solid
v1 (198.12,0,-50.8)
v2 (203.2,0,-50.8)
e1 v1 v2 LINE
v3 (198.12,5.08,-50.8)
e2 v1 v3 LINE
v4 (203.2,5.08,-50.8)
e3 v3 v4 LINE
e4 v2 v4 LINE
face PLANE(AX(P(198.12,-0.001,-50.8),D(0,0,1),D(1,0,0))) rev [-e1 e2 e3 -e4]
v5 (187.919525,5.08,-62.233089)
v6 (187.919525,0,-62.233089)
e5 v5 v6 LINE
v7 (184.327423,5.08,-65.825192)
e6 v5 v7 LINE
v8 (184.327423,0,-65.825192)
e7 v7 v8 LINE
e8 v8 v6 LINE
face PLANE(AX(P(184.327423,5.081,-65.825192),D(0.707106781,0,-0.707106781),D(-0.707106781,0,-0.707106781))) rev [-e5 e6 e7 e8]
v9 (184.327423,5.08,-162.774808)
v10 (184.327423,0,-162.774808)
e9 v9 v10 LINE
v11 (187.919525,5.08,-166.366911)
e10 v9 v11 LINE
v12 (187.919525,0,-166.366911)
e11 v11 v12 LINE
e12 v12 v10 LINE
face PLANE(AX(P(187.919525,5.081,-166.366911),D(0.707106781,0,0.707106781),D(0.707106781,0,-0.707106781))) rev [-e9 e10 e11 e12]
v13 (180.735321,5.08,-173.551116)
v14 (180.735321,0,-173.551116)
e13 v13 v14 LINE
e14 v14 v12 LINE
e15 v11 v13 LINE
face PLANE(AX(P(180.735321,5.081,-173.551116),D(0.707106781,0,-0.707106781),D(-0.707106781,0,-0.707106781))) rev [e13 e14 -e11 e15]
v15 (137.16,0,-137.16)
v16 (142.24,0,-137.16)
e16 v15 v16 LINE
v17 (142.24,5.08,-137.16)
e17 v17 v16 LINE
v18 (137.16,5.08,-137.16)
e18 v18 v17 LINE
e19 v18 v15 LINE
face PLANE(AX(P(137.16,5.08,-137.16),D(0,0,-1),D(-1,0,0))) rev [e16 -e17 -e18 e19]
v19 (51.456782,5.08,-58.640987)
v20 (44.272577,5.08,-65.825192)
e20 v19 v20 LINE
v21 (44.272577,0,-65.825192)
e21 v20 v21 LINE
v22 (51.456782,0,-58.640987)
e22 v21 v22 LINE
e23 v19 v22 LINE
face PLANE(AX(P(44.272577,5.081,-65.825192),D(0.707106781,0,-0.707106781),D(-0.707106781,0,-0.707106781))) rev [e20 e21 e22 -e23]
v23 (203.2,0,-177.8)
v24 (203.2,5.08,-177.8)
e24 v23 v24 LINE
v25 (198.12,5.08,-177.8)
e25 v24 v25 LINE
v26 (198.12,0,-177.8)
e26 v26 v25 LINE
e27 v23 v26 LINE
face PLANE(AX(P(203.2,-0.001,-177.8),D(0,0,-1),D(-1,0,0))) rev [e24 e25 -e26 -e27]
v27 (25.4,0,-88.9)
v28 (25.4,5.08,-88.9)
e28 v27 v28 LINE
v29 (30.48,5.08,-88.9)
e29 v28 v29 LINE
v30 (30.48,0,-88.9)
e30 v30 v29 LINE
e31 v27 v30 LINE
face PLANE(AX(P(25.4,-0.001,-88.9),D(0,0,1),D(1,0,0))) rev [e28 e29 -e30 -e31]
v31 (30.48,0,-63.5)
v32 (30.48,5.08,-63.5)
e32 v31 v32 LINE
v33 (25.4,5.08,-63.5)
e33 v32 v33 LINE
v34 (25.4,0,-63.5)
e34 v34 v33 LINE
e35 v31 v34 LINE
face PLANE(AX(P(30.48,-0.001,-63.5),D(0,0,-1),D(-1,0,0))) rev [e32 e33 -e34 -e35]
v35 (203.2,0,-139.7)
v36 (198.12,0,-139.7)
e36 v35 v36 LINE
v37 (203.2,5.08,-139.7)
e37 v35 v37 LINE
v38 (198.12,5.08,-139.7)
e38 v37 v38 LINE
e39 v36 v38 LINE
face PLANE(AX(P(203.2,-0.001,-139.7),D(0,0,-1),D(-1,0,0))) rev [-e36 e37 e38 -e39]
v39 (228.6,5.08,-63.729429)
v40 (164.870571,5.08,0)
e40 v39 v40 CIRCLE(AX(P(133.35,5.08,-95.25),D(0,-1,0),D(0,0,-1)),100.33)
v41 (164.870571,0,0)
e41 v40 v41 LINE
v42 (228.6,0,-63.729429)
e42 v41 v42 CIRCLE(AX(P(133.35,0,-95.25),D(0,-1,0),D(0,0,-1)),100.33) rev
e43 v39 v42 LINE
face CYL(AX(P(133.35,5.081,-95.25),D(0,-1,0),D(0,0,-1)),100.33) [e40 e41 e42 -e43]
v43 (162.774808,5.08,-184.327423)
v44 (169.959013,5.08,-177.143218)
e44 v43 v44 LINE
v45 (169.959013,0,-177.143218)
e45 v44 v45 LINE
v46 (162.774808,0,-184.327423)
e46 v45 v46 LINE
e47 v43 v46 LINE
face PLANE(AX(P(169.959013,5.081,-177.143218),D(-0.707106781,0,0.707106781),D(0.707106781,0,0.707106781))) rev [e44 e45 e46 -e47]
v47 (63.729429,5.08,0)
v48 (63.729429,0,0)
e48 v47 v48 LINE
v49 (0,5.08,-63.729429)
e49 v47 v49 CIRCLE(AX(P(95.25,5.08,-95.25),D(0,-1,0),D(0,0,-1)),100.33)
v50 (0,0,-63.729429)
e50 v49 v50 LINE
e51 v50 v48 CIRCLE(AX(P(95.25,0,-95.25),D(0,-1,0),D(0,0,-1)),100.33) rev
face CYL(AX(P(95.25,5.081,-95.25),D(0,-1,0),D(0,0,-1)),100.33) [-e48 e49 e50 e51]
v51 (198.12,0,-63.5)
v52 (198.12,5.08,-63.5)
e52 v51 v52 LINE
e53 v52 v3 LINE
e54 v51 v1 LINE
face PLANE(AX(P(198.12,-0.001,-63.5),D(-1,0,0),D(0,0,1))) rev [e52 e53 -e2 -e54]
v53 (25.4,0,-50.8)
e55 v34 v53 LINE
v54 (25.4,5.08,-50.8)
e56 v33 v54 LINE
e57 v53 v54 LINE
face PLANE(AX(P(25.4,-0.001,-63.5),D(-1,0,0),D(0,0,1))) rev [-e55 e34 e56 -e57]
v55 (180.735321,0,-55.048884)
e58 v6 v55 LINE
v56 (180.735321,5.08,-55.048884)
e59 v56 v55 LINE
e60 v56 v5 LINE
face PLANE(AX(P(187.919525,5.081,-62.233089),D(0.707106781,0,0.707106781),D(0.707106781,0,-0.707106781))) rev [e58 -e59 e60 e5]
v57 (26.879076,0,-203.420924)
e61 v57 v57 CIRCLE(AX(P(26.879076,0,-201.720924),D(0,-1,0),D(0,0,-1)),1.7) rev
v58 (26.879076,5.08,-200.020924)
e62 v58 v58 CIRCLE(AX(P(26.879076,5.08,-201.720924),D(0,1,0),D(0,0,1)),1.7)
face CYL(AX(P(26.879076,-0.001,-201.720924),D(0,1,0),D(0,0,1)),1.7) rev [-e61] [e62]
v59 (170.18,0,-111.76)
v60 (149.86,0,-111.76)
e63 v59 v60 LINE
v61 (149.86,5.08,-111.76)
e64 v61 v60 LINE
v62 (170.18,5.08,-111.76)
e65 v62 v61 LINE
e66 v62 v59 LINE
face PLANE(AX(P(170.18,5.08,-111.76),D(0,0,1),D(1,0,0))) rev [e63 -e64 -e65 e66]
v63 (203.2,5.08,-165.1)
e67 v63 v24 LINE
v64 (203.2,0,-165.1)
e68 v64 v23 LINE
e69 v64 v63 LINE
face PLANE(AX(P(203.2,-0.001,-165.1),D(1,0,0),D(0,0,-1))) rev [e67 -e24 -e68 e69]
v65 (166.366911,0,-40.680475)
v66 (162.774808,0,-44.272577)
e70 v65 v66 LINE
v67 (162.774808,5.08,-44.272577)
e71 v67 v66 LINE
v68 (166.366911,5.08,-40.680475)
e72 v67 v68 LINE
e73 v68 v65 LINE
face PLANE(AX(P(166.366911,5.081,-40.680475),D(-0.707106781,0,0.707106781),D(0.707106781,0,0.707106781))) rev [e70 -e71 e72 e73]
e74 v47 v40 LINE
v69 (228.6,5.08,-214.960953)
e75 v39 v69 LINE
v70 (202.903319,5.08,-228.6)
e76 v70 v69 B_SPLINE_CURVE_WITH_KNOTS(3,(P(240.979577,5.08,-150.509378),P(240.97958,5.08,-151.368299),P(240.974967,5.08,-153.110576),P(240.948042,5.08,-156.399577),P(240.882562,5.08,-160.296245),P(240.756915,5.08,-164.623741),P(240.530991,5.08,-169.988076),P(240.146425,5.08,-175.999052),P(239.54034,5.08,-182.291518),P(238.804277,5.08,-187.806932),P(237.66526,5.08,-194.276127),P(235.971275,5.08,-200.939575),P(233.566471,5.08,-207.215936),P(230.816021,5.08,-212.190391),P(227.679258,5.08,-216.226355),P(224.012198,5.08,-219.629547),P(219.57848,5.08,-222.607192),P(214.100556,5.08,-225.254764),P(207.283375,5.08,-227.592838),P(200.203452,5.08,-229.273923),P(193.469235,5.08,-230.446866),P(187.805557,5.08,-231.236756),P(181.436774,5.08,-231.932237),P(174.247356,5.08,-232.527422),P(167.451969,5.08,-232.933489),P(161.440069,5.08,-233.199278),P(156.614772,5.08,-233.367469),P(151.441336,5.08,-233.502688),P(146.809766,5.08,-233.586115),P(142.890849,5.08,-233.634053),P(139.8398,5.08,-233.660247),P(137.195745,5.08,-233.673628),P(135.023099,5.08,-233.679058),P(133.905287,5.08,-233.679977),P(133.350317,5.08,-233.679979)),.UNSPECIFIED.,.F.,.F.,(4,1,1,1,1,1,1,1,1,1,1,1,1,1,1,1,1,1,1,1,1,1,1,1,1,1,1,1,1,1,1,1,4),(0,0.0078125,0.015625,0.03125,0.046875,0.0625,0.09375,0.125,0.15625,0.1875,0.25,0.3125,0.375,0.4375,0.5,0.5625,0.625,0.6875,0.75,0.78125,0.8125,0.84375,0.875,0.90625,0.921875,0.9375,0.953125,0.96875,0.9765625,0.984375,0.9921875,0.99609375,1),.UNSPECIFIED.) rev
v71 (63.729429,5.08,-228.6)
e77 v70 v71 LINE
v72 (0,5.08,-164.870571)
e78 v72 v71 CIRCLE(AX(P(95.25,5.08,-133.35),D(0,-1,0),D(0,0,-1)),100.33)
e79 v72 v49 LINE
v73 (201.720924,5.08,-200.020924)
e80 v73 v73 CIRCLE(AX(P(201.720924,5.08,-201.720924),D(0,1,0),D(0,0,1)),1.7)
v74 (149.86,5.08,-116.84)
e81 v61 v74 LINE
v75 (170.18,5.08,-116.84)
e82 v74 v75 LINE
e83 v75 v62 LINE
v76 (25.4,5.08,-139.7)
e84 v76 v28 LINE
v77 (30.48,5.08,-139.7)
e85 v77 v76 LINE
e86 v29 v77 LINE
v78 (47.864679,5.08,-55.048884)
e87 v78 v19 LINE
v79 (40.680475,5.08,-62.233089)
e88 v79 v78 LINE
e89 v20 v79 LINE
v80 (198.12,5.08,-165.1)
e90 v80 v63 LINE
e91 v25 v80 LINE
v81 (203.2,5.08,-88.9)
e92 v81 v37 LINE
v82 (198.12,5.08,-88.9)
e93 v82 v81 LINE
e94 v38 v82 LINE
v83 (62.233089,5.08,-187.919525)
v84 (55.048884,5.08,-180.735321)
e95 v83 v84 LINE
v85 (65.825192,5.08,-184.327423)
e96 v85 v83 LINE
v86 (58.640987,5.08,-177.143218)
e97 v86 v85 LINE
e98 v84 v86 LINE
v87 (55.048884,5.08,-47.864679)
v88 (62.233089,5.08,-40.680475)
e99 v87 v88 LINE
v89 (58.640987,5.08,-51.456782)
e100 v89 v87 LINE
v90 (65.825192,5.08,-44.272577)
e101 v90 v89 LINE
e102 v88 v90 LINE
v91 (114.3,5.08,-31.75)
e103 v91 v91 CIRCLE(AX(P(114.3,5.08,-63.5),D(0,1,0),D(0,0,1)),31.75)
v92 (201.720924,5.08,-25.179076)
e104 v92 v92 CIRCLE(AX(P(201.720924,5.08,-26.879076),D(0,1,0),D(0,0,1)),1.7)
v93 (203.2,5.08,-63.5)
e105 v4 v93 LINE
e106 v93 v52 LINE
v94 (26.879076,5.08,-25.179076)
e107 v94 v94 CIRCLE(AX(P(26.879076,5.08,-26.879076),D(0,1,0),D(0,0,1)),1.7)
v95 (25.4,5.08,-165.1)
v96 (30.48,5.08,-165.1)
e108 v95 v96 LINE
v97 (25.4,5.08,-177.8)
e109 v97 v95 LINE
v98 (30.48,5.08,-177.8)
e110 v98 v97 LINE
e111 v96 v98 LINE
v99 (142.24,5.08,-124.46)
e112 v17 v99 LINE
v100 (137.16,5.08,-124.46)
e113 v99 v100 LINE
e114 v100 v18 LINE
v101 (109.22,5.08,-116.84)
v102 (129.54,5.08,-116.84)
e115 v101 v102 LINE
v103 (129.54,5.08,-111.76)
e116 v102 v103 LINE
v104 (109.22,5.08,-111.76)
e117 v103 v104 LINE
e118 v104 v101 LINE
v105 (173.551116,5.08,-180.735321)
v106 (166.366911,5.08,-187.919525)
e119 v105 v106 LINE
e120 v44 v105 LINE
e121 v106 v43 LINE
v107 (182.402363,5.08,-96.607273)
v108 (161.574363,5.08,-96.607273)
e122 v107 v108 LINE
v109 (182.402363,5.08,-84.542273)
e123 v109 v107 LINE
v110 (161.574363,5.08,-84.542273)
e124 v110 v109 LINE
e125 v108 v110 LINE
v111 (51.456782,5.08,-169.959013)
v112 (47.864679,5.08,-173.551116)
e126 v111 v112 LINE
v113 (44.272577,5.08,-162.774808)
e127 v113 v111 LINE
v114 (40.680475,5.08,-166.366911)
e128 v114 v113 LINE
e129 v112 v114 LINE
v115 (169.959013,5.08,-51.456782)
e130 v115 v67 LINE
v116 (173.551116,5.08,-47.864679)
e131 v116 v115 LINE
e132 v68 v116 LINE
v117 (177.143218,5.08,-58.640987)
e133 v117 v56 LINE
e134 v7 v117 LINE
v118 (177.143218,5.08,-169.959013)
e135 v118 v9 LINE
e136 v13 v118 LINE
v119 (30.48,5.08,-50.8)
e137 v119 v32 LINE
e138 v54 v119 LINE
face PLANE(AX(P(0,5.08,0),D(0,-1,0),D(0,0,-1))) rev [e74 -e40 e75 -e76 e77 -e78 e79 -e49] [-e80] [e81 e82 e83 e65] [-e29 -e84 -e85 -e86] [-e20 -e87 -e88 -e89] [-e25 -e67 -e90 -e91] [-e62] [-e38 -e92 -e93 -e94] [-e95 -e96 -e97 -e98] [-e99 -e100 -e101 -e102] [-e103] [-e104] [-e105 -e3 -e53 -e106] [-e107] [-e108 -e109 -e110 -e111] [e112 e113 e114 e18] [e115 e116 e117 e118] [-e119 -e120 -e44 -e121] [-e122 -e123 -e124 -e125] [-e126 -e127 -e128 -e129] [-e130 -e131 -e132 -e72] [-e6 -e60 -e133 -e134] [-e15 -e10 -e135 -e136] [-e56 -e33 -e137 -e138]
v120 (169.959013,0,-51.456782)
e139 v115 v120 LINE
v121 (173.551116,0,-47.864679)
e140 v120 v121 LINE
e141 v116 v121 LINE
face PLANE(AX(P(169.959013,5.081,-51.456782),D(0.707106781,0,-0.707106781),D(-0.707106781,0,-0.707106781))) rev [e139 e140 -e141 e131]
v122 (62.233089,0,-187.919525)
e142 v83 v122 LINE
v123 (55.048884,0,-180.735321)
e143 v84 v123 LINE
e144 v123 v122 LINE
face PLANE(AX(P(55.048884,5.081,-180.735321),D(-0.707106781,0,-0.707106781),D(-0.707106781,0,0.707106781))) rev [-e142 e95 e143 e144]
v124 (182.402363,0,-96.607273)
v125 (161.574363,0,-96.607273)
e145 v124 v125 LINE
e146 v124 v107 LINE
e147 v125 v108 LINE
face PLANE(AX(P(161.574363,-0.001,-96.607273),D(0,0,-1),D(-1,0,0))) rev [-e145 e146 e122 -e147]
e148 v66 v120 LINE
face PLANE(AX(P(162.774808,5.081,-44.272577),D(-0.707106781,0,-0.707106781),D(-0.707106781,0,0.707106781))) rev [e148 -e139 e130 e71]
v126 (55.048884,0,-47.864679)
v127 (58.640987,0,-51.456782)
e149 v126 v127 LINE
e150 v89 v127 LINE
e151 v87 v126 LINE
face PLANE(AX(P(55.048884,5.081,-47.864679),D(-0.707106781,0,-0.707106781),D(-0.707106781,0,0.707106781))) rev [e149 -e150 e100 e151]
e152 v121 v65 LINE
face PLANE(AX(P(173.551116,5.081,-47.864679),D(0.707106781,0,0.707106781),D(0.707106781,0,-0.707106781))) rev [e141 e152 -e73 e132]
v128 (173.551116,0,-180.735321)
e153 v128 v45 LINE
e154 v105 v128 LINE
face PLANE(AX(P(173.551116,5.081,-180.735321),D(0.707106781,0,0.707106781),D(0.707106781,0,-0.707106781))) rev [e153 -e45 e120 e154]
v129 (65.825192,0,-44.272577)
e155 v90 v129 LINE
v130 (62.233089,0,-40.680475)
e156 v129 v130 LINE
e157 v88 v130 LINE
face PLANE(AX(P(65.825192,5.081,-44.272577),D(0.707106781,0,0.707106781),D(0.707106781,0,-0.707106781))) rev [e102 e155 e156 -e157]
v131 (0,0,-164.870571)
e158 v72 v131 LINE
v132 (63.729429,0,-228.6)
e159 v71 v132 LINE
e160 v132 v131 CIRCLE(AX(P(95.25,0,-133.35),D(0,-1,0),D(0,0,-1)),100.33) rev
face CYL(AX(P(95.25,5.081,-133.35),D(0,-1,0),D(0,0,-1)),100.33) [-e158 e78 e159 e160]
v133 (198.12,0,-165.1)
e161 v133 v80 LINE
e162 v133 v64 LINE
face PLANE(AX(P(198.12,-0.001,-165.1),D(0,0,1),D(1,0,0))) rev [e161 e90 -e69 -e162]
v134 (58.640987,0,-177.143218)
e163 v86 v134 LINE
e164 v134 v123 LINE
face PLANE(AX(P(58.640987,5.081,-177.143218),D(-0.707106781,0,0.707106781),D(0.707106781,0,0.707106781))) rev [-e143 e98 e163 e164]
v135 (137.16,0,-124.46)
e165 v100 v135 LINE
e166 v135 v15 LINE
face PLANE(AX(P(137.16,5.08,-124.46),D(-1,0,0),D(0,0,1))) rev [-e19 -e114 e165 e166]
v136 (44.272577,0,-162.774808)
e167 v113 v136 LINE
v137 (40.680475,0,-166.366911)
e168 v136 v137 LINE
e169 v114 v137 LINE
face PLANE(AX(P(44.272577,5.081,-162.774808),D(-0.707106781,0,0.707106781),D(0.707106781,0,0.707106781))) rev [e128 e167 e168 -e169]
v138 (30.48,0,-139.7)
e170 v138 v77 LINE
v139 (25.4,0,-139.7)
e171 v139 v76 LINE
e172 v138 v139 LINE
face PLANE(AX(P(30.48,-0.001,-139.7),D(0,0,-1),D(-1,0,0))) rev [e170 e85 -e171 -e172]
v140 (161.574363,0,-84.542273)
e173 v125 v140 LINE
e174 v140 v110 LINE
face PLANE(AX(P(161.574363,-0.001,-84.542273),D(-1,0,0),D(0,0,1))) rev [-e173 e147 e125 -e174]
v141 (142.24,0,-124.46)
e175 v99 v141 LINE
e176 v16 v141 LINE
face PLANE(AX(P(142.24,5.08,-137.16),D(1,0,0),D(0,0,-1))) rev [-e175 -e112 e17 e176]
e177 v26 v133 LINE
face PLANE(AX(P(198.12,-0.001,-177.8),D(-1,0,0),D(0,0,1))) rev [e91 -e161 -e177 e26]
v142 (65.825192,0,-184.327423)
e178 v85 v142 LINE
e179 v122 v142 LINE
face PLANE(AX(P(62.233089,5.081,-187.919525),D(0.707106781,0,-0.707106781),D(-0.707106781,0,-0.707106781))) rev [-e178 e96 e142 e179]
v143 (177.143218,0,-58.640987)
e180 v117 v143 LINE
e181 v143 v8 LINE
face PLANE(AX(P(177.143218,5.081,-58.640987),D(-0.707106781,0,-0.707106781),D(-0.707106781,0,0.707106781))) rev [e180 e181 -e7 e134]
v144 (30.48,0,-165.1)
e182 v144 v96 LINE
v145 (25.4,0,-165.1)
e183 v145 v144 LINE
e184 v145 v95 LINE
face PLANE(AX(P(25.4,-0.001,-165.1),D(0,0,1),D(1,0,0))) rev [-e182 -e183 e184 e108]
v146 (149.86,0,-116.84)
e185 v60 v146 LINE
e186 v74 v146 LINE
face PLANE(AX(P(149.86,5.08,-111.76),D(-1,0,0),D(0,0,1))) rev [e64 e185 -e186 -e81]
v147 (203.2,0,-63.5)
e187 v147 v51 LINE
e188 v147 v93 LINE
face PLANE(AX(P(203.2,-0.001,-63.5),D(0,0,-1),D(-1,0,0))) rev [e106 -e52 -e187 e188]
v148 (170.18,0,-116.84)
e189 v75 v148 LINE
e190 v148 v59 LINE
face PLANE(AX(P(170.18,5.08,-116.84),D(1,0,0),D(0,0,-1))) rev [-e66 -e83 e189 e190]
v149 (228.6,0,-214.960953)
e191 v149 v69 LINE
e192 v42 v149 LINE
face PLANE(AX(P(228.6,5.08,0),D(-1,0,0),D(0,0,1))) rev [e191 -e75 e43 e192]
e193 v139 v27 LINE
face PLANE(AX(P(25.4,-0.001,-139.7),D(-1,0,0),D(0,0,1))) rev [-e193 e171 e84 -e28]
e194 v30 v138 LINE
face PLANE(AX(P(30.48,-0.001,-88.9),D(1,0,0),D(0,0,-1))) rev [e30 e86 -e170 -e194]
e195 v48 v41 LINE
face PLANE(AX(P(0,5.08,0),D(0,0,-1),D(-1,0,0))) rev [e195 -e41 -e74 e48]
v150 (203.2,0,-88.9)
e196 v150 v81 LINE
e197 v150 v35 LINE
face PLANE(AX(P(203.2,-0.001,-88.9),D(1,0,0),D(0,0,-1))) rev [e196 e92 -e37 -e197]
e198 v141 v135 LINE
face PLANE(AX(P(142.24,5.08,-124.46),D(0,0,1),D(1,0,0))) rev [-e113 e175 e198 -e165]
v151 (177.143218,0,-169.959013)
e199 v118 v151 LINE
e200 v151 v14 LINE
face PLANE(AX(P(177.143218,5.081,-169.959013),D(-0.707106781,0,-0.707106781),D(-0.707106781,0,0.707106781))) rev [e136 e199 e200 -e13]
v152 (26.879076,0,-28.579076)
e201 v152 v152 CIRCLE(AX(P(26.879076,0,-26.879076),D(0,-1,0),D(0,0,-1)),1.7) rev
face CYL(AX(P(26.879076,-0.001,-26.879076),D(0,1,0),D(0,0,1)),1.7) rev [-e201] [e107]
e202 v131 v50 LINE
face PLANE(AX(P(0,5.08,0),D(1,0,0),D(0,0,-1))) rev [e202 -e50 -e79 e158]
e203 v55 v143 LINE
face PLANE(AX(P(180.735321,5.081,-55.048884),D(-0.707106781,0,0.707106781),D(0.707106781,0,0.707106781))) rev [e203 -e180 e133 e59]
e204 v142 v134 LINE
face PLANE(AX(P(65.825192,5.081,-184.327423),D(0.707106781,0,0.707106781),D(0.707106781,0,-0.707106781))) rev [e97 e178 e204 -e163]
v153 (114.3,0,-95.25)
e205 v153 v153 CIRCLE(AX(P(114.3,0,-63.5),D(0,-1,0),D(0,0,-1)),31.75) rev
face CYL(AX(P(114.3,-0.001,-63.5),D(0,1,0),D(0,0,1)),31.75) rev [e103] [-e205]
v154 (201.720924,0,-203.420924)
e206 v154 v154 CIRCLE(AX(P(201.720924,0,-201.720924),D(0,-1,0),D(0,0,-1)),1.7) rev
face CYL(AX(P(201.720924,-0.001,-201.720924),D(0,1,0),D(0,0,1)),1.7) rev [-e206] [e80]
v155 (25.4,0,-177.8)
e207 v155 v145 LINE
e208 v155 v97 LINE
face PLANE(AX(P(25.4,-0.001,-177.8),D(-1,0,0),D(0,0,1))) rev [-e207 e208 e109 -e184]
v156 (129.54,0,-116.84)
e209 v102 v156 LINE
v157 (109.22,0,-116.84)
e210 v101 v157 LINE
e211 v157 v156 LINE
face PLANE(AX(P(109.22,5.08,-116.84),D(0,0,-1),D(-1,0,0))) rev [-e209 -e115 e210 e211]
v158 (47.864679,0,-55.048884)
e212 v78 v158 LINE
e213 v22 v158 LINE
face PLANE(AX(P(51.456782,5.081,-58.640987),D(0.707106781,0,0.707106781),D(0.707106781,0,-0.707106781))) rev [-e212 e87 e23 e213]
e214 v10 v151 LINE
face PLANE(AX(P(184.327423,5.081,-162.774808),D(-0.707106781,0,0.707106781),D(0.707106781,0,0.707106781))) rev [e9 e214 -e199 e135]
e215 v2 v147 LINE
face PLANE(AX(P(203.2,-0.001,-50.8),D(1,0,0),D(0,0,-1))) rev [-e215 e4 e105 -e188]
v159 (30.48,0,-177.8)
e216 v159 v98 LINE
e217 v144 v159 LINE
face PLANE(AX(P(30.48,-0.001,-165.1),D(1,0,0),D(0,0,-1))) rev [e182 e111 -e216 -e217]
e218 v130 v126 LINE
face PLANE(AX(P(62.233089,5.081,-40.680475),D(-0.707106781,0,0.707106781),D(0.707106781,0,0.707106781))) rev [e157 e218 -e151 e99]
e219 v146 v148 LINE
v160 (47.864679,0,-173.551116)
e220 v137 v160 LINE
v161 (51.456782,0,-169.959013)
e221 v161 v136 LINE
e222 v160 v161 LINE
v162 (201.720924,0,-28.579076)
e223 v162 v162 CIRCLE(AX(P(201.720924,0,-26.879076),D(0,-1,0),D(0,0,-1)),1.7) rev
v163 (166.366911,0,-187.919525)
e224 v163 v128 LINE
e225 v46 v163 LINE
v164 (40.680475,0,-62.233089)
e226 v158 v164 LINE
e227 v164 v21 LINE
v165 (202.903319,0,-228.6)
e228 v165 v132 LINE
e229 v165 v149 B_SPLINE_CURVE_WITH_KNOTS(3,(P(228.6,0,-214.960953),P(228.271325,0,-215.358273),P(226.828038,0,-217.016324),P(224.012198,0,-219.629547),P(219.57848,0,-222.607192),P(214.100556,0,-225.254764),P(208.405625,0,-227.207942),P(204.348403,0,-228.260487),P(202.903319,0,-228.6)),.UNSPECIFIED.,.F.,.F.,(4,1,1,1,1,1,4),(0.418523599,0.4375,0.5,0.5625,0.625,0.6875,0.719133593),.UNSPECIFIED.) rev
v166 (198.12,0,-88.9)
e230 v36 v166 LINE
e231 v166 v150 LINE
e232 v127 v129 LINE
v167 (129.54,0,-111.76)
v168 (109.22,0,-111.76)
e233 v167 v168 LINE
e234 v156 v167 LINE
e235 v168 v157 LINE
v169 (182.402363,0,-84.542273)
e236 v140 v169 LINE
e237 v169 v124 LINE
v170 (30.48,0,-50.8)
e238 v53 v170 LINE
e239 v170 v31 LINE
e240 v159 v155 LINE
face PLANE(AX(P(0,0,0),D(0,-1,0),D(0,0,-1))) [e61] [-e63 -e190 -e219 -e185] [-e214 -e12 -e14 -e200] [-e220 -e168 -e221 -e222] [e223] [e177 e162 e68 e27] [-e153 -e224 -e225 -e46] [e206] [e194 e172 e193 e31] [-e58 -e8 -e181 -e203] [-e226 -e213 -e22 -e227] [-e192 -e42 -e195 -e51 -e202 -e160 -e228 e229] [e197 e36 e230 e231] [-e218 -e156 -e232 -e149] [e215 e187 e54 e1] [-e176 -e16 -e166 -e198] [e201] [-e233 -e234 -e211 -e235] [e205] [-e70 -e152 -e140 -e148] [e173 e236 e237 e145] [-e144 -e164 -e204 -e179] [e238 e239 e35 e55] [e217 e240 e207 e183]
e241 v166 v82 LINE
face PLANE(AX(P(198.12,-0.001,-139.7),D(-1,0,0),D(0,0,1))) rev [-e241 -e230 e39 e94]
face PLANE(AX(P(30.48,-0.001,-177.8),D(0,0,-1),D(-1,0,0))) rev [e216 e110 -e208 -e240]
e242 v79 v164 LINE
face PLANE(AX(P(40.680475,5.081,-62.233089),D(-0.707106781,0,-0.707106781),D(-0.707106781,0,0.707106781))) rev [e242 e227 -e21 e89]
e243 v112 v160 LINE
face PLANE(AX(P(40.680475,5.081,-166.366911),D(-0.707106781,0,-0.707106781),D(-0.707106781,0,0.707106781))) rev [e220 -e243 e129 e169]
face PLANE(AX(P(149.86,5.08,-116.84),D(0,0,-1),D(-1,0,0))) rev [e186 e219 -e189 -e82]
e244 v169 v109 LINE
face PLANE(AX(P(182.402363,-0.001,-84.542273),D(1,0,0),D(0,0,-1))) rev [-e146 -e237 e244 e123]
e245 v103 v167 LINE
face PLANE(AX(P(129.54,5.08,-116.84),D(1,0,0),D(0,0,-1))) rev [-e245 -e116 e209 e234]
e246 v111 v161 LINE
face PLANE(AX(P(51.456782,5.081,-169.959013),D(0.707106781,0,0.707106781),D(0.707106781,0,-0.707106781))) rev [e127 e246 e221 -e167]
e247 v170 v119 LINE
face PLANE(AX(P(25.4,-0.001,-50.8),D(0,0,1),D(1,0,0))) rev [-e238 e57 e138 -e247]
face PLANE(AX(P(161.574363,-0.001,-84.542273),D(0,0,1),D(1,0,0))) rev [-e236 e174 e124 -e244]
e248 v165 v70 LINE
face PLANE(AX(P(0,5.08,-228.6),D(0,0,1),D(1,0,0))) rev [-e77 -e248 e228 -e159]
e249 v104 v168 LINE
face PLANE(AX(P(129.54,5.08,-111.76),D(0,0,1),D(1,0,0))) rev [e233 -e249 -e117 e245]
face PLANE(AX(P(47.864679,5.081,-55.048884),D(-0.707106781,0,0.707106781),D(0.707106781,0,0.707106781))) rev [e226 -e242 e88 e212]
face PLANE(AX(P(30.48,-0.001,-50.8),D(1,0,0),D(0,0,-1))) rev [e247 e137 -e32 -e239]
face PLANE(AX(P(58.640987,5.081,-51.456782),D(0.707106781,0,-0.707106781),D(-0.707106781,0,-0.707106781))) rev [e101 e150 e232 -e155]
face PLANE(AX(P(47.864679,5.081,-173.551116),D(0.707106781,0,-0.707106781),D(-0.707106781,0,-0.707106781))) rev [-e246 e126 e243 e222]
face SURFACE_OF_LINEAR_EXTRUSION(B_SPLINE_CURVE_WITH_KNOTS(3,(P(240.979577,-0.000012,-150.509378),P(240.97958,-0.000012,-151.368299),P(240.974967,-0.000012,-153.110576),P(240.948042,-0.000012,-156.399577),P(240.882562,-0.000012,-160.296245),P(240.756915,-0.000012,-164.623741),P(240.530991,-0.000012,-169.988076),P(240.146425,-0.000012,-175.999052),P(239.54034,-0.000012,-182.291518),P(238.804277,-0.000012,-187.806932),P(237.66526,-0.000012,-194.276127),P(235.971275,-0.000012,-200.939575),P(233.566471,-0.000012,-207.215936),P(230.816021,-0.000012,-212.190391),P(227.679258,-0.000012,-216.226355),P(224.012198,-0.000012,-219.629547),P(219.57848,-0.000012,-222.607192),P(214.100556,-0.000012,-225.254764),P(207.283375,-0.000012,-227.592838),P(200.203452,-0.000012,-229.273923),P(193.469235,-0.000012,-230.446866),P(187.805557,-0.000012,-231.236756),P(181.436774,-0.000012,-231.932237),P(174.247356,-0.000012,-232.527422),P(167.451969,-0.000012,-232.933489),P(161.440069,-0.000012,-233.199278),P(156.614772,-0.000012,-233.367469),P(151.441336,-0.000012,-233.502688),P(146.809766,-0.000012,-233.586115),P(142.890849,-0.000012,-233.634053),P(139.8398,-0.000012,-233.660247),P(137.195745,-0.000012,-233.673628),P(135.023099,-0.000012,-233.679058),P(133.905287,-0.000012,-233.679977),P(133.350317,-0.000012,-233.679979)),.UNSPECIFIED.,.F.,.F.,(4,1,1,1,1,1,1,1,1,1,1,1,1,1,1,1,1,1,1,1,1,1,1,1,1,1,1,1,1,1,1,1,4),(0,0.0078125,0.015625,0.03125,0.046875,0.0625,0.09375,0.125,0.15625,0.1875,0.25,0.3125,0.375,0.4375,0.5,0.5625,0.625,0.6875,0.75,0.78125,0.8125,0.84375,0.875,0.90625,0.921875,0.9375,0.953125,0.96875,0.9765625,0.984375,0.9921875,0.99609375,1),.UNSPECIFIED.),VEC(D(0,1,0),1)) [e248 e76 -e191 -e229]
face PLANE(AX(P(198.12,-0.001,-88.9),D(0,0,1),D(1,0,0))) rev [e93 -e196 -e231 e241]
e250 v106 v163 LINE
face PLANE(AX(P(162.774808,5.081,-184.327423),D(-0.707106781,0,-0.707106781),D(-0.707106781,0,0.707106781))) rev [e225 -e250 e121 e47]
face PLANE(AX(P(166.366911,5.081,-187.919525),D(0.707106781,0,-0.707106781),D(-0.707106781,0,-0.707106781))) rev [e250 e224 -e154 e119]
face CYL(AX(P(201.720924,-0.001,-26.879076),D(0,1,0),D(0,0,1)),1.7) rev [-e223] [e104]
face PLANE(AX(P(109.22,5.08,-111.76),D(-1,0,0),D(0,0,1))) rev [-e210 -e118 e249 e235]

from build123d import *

# Parameters (mm, degrees)
SKETCH1_W           = 228.6
SKETCH1_H           = 228.6
BOSS_EXTRUDE1_DEPTH = 5.08
CUT_EXTRUDE2_REACH  = 325.329
SKETCH9_W           = 5.08
SKETCH9_H           = 12.7
SKETCH9_H_2         = 50.8
CUT_EXTRUDE7_START  = -5.08
CUT_EXTRUDE7_DEPTH  = 5.08
CUT_EXTRUDE5_REACH  = 325.329
SKETCH13_R          = 1.7
CUT_EXTRUDE6_REACH  = 325.329
SKETCH16_W          = 5.08
SKETCH16_H          = 12.7
CUT_EXTRUDE8_DEPTH  = 324.329130287
SKETCH17_W          = 20.32
SKETCH17_H          = 5.08
CUT_EXTRUDE9_DEPTH  = 324.329130287
CUT_EXTRUDE10_REACH = 325.329
SKETCH18_R          = 31.75
CUT_EXTRUDE11_REACH = 325.329
SKETCH19_W          = 20.828
SKETCH19_H          = 12.065


# Read off the part's stored shape, not the designer's step: Cut-Extrude7
with BuildPart() as part:
    # Sketch1 → Boss-Extrude1 (new body)
    with BuildSketch(Plane(origin=(0, 0, 0), x_dir=(1, 0, 0), z_dir=(0, 1, 0))):
        with Locations((114.3, 114.3)):
            Rectangle(SKETCH1_W, SKETCH1_H)
    extrude(amount=BOSS_EXTRUDE1_DEPTH)

    # Sketch9 → Cut-Extrude2 (cut, up to next)
    with BuildSketch(Plane(origin=(0, 5.08, 0), x_dir=(1, 0, 0), z_dir=(0, 1, 0)), mode=Mode.PRIVATE) as cut_extrude2_sk1:
        with Locations((27.94, 57.15)):
            Rectangle(SKETCH9_W, SKETCH9_H)
    cut_extrude2_tool1 = extrude(cut_extrude2_sk1.sketch, amount=-CUT_EXTRUDE2_REACH, mode=Mode.PRIVATE) & part.part
    # Sketch9 → Cut-Extrude2 (cut, up to next)
    with BuildSketch(Plane(origin=(0, 5.08, 0), x_dir=(1, 0, 0), z_dir=(0, 1, 0)), mode=Mode.PRIVATE) as cut_extrude2_sk2:
        with Locations((27.94, 171.45)):
            Rectangle(SKETCH9_W, SKETCH9_H)
    cut_extrude2_tool2 = extrude(cut_extrude2_sk2.sketch, amount=-CUT_EXTRUDE2_REACH, mode=Mode.PRIVATE) & part.part
    # Sketch9 → Cut-Extrude2 (cut, up to next)
    with BuildSketch(Plane(origin=(0, 5.08, 0), x_dir=(1, 0, 0), z_dir=(0, 1, 0)), mode=Mode.PRIVATE) as cut_extrude2_sk3:
        with Locations((27.94, 114.3)):
            Rectangle(SKETCH9_W, SKETCH9_H_2)
    cut_extrude2_tool3 = extrude(cut_extrude2_sk3.sketch, amount=-CUT_EXTRUDE2_REACH, mode=Mode.PRIVATE) & part.part
    # Sketch9 → Cut-Extrude2 (cut, up to next)
    with BuildSketch(Plane(origin=(0, 5.08, 0), x_dir=(1, 0, 0), z_dir=(0, 1, 0)), mode=Mode.PRIVATE) as cut_extrude2_sk4:
        with Locations((200.66, 57.15)):
            Rectangle(SKETCH9_W, SKETCH9_H)
    cut_extrude2_tool4 = extrude(cut_extrude2_sk4.sketch, amount=-CUT_EXTRUDE2_REACH, mode=Mode.PRIVATE) & part.part
    # Sketch9 → Cut-Extrude2 (cut, up to next)
    with BuildSketch(Plane(origin=(0, 5.08, 0), x_dir=(1, 0, 0), z_dir=(0, 1, 0)), mode=Mode.PRIVATE) as cut_extrude2_sk5:
        with Locations((200.66, 171.45)):
            Rectangle(SKETCH9_W, SKETCH9_H)
    cut_extrude2_tool5 = extrude(cut_extrude2_sk5.sketch, amount=-CUT_EXTRUDE2_REACH, mode=Mode.PRIVATE) & part.part
    # Sketch9 → Cut-Extrude2 (cut, up to next)
    with BuildSketch(Plane(origin=(0, 5.08, 0), x_dir=(1, 0, 0), z_dir=(0, 1, 0)), mode=Mode.PRIVATE) as cut_extrude2_sk6:
        with Locations((200.66, 114.3)):
            Rectangle(SKETCH9_W, SKETCH9_H_2)
    cut_extrude2_tool6 = extrude(cut_extrude2_sk6.sketch, amount=-CUT_EXTRUDE2_REACH, mode=Mode.PRIVATE) & part.part
    add(cut_extrude2_tool1.solids().sort_by_distance((27.94, 5.08, -57.15))[0], mode=Mode.SUBTRACT)
    add(cut_extrude2_tool2.solids().sort_by_distance((27.94, 5.08, -171.45))[0], mode=Mode.SUBTRACT)
    add(cut_extrude2_tool3.solids().sort_by_distance((27.94, 5.08, -114.3))[0], mode=Mode.SUBTRACT)
    add(cut_extrude2_tool4.solids().sort_by_distance((200.66, 5.08, -57.15))[0], mode=Mode.SUBTRACT)
    add(cut_extrude2_tool5.solids().sort_by_distance((200.66, 5.08, -171.45))[0], mode=Mode.SUBTRACT)
    add(cut_extrude2_tool6.solids().sort_by_distance((200.66, 5.08, -114.3))[0], mode=Mode.SUBTRACT)

    # Cut-Extrude7 outline → Cut-Extrude7 (cut)
    with BuildSketch(Plane.XZ.offset(CUT_EXTRUDE7_START)):
        with BuildLine():
            Line((228.6, -228.6), (228.6, -214.96095324))
            add(Edge.make_bspline(
                [(228.6, -214.96095324), (228.271324847, -215.358272881), (226.828038088, -217.01632419), (224.012197717, -219.629547006), (219.578479693, -222.607192086), (214.100555872, -225.254763581), (208.4056249, -227.207942052), (204.348403214, -228.260486737), (202.903319092, -228.6)],
                knots=[0.418523599, 0.418523599, 0.418523599, 0.418523599, 0.4375, 0.5, 0.5625, 0.625, 0.6875, 0.719133593, 0.719133593, 0.719133593, 0.719133593], degree=3))
            Line((202.903319092, -228.6), (228.6, -228.6))
        make_face()
        with BuildLine():
            ThreePointArc((164.870571061, 0), (204.294023356, -24.305976644), (228.6, -63.729428939))
            Line((228.6, -63.729428939), (228.6, 0))
            Line((228.6, 0), (164.870571061, 0))
        make_face()
        with BuildLine():
            Line((0, -228.6), (63.729428939, -228.6))
            ThreePointArc((63.729428939, -228.6), (24.305976644, -204.294023356), (0, -164.870571061))
            Line((0, -164.870571061), (0, -228.6))
        make_face()
        with BuildLine():
            ThreePointArc((0, -63.729428939), (24.305976644, -24.305976644), (63.729428939, 0))
            Line((63.729428939, 0), (0, 0))
            Line((0, 0), (0, -63.729428939))
        make_face()
    extrude(amount=CUT_EXTRUDE7_DEPTH, mode=Mode.SUBTRACT)

    # Sketch13 → Cut-Extrude5 (cut, up to next)
    with BuildSketch(Plane(origin=(0, 5.08, 0), x_dir=(1, 0, 0), z_dir=(0, 1, 0)), mode=Mode.PRIVATE) as cut_extrude5_sk1:
        with Locations(Location((26.879075631, 26.879075631, 0), (0, 0, 270))):
            Circle(SKETCH13_R)
    cut_extrude5_tool1 = extrude(cut_extrude5_sk1.sketch, amount=-CUT_EXTRUDE5_REACH, mode=Mode.PRIVATE) & part.part
    # Sketch13 → Cut-Extrude5 (cut, up to next)
    with BuildSketch(Plane(origin=(0, 5.08, 0), x_dir=(1, 0, 0), z_dir=(0, 1, 0)), mode=Mode.PRIVATE) as cut_extrude5_sk2:
        with Locations(Location((201.720924369, 201.720924369, 0), (0, 0, 270))):
            Circle(SKETCH13_R)
    cut_extrude5_tool2 = extrude(cut_extrude5_sk2.sketch, amount=-CUT_EXTRUDE5_REACH, mode=Mode.PRIVATE) & part.part
    # Sketch13 → Cut-Extrude5 (cut, up to next)
    with BuildSketch(Plane(origin=(0, 5.08, 0), x_dir=(1, 0, 0), z_dir=(0, 1, 0)), mode=Mode.PRIVATE) as cut_extrude5_sk3:
        with Locations(Location((26.879075631, 201.720924369, 0), (0, 0, 270))):
            Circle(SKETCH13_R)
    cut_extrude5_tool3 = extrude(cut_extrude5_sk3.sketch, amount=-CUT_EXTRUDE5_REACH, mode=Mode.PRIVATE) & part.part
    # Sketch13 → Cut-Extrude5 (cut, up to next)
    with BuildSketch(Plane(origin=(0, 5.08, 0), x_dir=(1, 0, 0), z_dir=(0, 1, 0)), mode=Mode.PRIVATE) as cut_extrude5_sk4:
        with Locations(Location((201.720924369, 26.879075631, 0), (0, 0, 270))):
            Circle(SKETCH13_R)
    cut_extrude5_tool4 = extrude(cut_extrude5_sk4.sketch, amount=-CUT_EXTRUDE5_REACH, mode=Mode.PRIVATE) & part.part
    add(cut_extrude5_tool1.solids().sort_by_distance((26.879076, 5.08, -26.879076))[0], mode=Mode.SUBTRACT)
    add(cut_extrude5_tool2.solids().sort_by_distance((201.720924, 5.08, -201.720924))[0], mode=Mode.SUBTRACT)
    add(cut_extrude5_tool3.solids().sort_by_distance((26.879076, 5.08, -201.720924))[0], mode=Mode.SUBTRACT)
    add(cut_extrude5_tool4.solids().sort_by_distance((201.720924, 5.08, -26.879076))[0], mode=Mode.SUBTRACT)

    # Sketch14 → Cut-Extrude6 (cut, up to next)
    with BuildSketch(Plane.XZ, mode=Mode.PRIVATE) as cut_extrude6_sk1:
        Polygon((169.959013197, -177.143218094), (162.774808301, -184.327422991), (166.366910749, -187.91952544), (173.551115646, -180.735320543), align=None)
    cut_extrude6_tool1 = extrude(cut_extrude6_sk1.sketch, amount=-CUT_EXTRUDE6_REACH, mode=Mode.PRIVATE) & part.part
    # Sketch14 → Cut-Extrude6 (cut, up to next)
    with BuildSketch(Plane.XZ, mode=Mode.PRIVATE) as cut_extrude6_sk2:
        Polygon((184.327422991, -162.774808301), (177.143218094, -169.959013197), (180.735320543, -173.551115646), (187.91952544, -166.366910749), align=None)
    cut_extrude6_tool2 = extrude(cut_extrude6_sk2.sketch, amount=-CUT_EXTRUDE6_REACH, mode=Mode.PRIVATE) & part.part
    # Sketch14 → Cut-Extrude6 (cut, up to next)
    with BuildSketch(Plane.XZ, mode=Mode.PRIVATE) as cut_extrude6_sk3:
        Polygon((65.825191699, -184.327422991), (58.640986803, -177.143218094), (55.048884354, -180.735320543), (62.233089251, -187.91952544), align=None)
    cut_extrude6_tool3 = extrude(cut_extrude6_sk3.sketch, amount=-CUT_EXTRUDE6_REACH, mode=Mode.PRIVATE) & part.part
    # Sketch14 → Cut-Extrude6 (cut, up to next)
    with BuildSketch(Plane.XZ, mode=Mode.PRIVATE) as cut_extrude6_sk4:
        Polygon((51.456781906, -169.959013197), (44.272577009, -162.774808301), (40.68047456, -166.366910749), (47.864679457, -173.551115646), align=None)
    cut_extrude6_tool4 = extrude(cut_extrude6_sk4.sketch, amount=-CUT_EXTRUDE6_REACH, mode=Mode.PRIVATE) & part.part
    # Sketch14 → Cut-Extrude6 (cut, up to next)
    with BuildSketch(Plane.XZ, mode=Mode.PRIVATE) as cut_extrude6_sk5:
        Polygon((177.143218094, -58.640986803), (184.327422991, -65.825191699), (187.91952544, -62.233089251), (180.735320543, -55.048884354), align=None)
    cut_extrude6_tool5 = extrude(cut_extrude6_sk5.sketch, amount=-CUT_EXTRUDE6_REACH, mode=Mode.PRIVATE) & part.part
    # Sketch14 → Cut-Extrude6 (cut, up to next)
    with BuildSketch(Plane.XZ, mode=Mode.PRIVATE) as cut_extrude6_sk6:
        Polygon((162.774808301, -44.272577009), (169.959013197, -51.456781906), (173.551115646, -47.864679457), (166.366910749, -40.68047456), align=None)
    cut_extrude6_tool6 = extrude(cut_extrude6_sk6.sketch, amount=-CUT_EXTRUDE6_REACH, mode=Mode.PRIVATE) & part.part
    # Sketch14 → Cut-Extrude6 (cut, up to next)
    with BuildSketch(Plane.XZ, mode=Mode.PRIVATE) as cut_extrude6_sk7:
        Polygon((44.272577009, -65.825191699), (51.456781906, -58.640986803), (47.864679457, -55.048884354), (40.68047456, -62.233089251), align=None)
    cut_extrude6_tool7 = extrude(cut_extrude6_sk7.sketch, amount=-CUT_EXTRUDE6_REACH, mode=Mode.PRIVATE) & part.part
    # Sketch14 → Cut-Extrude6 (cut, up to next)
    with BuildSketch(Plane.XZ, mode=Mode.PRIVATE) as cut_extrude6_sk8:
        Polygon((58.640986803, -51.456781906), (65.825191699, -44.272577009), (62.233089251, -40.68047456), (55.048884354, -47.864679457), align=None)
    cut_extrude6_tool8 = extrude(cut_extrude6_sk8.sketch, amount=-CUT_EXTRUDE6_REACH, mode=Mode.PRIVATE) & part.part
    add(cut_extrude6_tool1.solids().sort_by_distance((168.162962, 0, -182.531372))[0], mode=Mode.SUBTRACT)
    add(cut_extrude6_tool2.solids().sort_by_distance((182.531372, 0, -168.162962))[0], mode=Mode.SUBTRACT)
    add(cut_extrude6_tool3.solids().sort_by_distance((60.437038, 0, -182.531372))[0], mode=Mode.SUBTRACT)
    add(cut_extrude6_tool4.solids().sort_by_distance((46.068628, 0, -168.162962))[0], mode=Mode.SUBTRACT)
    add(cut_extrude6_tool5.solids().sort_by_distance((182.531372, 0, -60.437038))[0], mode=Mode.SUBTRACT)
    add(cut_extrude6_tool6.solids().sort_by_distance((168.162962, 0, -46.068628))[0], mode=Mode.SUBTRACT)
    add(cut_extrude6_tool7.solids().sort_by_distance((46.068628, 0, -60.437038))[0], mode=Mode.SUBTRACT)
    add(cut_extrude6_tool8.solids().sort_by_distance((60.437038, 0, -46.068628))[0], mode=Mode.SUBTRACT)

    # Sketch16 → Cut-Extrude8 (cut, through all)
    with BuildSketch(Plane.XZ):
        with Locations((139.7, -130.81)):
            Rectangle(SKETCH16_W, SKETCH16_H)
    extrude(amount=-CUT_EXTRUDE8_DEPTH, mode=Mode.SUBTRACT)

    # Sketch17 → Cut-Extrude9 (cut, through all)
    with BuildSketch(Plane.XZ):
        with Locations((119.38, -114.3)):
            Rectangle(SKETCH17_W, SKETCH17_H)
        with Locations((160.02, -114.3)):
            Rectangle(SKETCH17_W, SKETCH17_H)
    extrude(amount=-CUT_EXTRUDE9_DEPTH, mode=Mode.SUBTRACT)

    # Sketch18 → Cut-Extrude10 (cut, up to next)
    with BuildSketch(Plane(origin=(0, 5.08, 0), x_dir=(1, 0, 0), z_dir=(0, 1, 0)), mode=Mode.PRIVATE) as cut_extrude10_sk1:
        with Locations(Location((114.3, 63.5, 0), (0, 0, 270))):
            Circle(SKETCH18_R)
    cut_extrude10_tool1 = extrude(cut_extrude10_sk1.sketch, amount=-CUT_EXTRUDE10_REACH, mode=Mode.PRIVATE) & part.part
    add(cut_extrude10_tool1.solids().sort_by_distance((114.3, 5.08, -63.5))[0], mode=Mode.SUBTRACT)

    # Sketch19 → Cut-Extrude11 (cut, up to next)
    with BuildSketch(Plane(origin=(0, 5.08, 0), x_dir=(1, 0, 0), z_dir=(0, 1, 0)), mode=Mode.PRIVATE) as cut_extrude11_sk1:
        with Locations((171.988363225, 90.574772783)):
            Rectangle(SKETCH19_W, SKETCH19_H)
    cut_extrude11_tool1 = extrude(cut_extrude11_sk1.sketch, amount=-CUT_EXTRUDE11_REACH, mode=Mode.PRIVATE) & part.part
    add(cut_extrude11_tool1.solids().sort_by_distance((171.988363, 5.08, -90.574773))[0], mode=Mode.SUBTRACT)


solid = part.part
